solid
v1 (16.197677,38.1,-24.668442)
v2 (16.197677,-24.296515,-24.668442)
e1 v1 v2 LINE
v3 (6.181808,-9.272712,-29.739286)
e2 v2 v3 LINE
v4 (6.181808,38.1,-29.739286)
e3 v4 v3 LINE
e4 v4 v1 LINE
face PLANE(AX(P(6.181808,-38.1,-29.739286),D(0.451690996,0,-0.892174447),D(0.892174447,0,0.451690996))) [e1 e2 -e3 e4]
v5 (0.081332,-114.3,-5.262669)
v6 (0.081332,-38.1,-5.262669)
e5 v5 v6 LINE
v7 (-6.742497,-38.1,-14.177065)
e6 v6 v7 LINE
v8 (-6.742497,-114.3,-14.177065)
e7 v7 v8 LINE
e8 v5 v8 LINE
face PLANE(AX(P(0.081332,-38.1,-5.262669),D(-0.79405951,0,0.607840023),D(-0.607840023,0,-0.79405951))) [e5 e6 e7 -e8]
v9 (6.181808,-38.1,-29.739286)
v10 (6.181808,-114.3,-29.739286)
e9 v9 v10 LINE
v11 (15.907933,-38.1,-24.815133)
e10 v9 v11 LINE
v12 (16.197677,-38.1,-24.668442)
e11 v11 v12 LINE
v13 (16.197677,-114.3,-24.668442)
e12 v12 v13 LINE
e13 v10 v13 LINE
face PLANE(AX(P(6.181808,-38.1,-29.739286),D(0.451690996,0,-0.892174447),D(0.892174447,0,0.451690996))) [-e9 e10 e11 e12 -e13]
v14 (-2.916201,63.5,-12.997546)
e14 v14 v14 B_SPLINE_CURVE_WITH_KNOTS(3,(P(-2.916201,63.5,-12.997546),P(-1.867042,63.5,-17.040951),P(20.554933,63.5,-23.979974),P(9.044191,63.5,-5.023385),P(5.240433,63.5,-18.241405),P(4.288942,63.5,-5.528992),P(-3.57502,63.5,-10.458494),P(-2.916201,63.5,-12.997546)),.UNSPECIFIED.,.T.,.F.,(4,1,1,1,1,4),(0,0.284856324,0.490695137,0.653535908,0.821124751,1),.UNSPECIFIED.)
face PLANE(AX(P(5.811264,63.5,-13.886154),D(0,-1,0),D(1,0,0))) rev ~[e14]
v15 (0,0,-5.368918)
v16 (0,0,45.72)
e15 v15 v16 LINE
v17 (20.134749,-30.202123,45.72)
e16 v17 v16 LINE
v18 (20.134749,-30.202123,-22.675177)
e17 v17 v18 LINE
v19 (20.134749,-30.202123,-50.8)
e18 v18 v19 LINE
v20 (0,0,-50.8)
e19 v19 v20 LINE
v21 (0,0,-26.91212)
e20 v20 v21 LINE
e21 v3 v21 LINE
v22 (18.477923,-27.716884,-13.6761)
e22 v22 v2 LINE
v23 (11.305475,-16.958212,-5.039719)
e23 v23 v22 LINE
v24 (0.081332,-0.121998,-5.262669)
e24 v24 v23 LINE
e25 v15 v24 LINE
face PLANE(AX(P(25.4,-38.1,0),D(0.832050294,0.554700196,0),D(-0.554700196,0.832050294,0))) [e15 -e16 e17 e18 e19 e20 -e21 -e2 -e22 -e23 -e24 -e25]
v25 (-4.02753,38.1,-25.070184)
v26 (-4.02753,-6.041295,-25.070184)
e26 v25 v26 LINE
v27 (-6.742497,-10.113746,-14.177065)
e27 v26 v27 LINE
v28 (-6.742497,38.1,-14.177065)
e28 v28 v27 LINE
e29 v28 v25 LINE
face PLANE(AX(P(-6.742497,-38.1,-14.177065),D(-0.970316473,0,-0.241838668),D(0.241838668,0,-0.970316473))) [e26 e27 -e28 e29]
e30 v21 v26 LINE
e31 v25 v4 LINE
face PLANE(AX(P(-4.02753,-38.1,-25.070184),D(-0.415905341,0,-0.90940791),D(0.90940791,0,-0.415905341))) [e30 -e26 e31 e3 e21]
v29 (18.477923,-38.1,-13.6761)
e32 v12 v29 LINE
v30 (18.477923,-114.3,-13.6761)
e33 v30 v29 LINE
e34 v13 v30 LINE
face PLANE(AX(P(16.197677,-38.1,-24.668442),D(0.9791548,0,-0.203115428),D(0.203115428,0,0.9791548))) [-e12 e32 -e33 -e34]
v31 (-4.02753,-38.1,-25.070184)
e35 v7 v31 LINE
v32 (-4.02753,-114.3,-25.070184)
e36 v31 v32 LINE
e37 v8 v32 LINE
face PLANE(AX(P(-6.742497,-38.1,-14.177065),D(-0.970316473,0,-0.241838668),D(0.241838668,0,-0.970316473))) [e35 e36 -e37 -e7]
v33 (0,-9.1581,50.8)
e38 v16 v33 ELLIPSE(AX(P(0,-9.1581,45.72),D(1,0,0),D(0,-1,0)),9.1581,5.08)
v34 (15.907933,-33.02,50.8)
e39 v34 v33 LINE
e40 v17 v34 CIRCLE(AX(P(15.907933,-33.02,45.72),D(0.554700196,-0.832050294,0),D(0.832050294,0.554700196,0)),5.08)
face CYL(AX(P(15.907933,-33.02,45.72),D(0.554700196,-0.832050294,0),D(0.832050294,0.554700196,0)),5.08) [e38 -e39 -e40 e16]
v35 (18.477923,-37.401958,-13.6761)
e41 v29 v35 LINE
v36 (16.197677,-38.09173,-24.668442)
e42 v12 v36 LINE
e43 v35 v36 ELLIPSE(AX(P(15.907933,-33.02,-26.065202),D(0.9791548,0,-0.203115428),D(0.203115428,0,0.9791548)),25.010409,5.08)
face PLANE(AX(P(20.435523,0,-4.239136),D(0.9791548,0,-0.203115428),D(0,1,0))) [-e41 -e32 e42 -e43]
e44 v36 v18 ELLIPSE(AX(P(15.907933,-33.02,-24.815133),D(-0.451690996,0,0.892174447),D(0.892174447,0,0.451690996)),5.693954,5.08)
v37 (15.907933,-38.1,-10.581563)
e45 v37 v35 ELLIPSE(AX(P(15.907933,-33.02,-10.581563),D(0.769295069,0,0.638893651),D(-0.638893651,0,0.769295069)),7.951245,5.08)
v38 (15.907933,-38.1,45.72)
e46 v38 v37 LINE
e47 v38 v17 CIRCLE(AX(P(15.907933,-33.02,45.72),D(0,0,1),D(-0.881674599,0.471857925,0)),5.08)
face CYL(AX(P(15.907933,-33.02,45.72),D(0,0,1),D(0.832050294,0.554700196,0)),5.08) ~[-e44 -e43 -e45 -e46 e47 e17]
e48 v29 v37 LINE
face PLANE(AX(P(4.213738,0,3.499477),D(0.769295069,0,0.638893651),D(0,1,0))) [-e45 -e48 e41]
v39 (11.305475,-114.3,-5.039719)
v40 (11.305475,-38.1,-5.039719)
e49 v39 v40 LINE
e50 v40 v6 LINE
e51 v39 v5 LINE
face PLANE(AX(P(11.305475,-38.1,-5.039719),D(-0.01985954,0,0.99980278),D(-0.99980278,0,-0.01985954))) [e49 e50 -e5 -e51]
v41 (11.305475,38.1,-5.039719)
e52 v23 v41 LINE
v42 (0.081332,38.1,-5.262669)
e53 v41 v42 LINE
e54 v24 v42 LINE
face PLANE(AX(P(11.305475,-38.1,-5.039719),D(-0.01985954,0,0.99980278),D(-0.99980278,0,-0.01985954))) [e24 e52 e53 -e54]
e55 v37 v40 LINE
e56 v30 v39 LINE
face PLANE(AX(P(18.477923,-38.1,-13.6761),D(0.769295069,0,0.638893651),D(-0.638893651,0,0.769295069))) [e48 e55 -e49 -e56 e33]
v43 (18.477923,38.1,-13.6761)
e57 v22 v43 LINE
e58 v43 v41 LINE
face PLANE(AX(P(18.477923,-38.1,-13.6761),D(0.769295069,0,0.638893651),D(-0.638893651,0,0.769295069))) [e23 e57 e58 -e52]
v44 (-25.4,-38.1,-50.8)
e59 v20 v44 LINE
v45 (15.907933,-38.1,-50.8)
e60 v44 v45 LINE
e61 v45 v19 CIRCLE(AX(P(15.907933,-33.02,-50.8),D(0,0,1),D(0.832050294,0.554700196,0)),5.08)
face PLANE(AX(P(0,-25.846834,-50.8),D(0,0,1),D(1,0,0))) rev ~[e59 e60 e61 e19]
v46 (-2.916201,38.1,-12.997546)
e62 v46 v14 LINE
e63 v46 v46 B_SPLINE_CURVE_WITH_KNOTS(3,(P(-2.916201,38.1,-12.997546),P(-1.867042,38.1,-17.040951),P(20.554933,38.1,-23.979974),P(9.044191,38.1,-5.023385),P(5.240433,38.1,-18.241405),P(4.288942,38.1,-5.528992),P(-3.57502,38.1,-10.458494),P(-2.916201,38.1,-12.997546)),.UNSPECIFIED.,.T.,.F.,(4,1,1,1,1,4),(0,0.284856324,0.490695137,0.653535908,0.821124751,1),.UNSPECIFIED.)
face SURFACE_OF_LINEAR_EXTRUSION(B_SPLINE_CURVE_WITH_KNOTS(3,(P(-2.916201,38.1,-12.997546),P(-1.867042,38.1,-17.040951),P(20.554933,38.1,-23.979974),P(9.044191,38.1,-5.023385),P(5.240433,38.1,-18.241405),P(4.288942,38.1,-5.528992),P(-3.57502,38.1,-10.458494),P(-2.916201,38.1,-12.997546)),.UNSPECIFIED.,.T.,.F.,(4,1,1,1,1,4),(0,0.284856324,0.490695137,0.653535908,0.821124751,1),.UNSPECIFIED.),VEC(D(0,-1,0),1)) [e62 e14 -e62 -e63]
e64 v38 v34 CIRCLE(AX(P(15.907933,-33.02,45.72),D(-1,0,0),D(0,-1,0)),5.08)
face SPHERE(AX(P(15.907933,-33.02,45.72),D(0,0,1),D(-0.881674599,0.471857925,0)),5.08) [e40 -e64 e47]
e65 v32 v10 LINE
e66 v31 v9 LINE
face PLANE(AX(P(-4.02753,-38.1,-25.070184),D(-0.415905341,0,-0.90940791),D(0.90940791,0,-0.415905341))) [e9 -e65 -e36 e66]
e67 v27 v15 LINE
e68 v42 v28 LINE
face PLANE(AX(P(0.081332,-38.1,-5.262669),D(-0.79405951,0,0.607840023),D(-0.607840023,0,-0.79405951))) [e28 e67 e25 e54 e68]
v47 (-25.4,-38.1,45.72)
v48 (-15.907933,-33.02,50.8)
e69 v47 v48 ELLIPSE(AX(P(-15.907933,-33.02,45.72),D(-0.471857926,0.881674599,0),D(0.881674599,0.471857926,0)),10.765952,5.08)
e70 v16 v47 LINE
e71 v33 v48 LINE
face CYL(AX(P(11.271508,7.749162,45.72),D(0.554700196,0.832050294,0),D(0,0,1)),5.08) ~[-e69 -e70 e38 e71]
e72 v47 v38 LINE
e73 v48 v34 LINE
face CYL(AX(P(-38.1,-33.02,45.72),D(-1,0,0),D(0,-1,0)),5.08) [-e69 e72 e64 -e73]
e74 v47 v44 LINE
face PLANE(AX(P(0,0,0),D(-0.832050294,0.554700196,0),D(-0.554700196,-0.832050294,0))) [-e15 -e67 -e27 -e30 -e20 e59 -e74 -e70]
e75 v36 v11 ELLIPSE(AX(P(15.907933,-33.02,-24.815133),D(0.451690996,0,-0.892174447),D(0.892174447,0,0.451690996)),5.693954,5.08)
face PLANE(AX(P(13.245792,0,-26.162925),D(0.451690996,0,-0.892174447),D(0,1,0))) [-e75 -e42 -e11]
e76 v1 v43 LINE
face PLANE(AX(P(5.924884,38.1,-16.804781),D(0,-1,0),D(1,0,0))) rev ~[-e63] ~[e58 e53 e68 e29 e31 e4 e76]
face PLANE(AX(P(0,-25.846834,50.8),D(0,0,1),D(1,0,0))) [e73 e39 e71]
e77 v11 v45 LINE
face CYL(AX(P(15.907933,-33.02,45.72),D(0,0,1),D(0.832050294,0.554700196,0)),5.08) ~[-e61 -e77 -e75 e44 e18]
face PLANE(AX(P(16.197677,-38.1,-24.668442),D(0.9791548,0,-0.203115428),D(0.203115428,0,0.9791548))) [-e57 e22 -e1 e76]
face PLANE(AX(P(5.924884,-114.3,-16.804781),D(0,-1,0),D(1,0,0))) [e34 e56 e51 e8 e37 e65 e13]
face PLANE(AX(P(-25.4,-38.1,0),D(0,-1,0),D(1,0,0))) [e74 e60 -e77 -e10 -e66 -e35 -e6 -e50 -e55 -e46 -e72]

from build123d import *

# Parameters (mm, degrees)
F1_DEPTH     = 50.8
F3_DEPTH     = 76.2
F5_DEPTH     = 25.4
F6_T1_DEPTH  = 48.9984343719
F6_T3_DEPTH  = 71.1905011984
F6_T5_DEPTH  = 54.0079331735
F6_T10_DEPTH = 5.08
F6_T16_DEPTH = 120.2501670661
F6_T22_DEPTH = 120.2501670661
F6_T29_DEPTH = 120.2501670661
F6_T35_DEPTH = 120.2501670661
F6_T42_DEPTH = 120.2501670661
F6_T49_DEPTH = 120.2501670661


# Not quite as in the source:
# - a fillet or chamfer that OpenCascade refuses, or shapes differently, is made with other operations: its cross-section is extruded or revolved along the edge and cut away or added


with BuildPart() as f1:
    # F0 (on Top) → F1 (new body, symmetric)
    with BuildSketch(Plane.XY):
        Polygon((25.4, -38.1), (0, 0), (-25.4, -38.1), align=None)
    extrude(amount=F1_DEPTH, both=True)

    # F2 (on face) → F3 (join, symmetric)
    with BuildSketch(Plane.XZ.offset(38.1)):
        Polygon((0.0813317902, -5.2626694994), (-6.7424972958, -14.1770650191), (-4.0275300761, -25.0701841258), (6.1818077576, -29.739285953), (16.197676584, -24.6684415925), (18.4779228904, -13.6761002742), (11.3054746994, -5.0397192136), align=None)
    extrude(amount=F3_DEPTH, both=True)

    # F4 (on face) → F5 (join)
    with BuildSketch(Plane(origin=(0, 38.1, 0), x_dir=(-1, 0, 0), z_dir=(0, 1, 0))):
        with BuildLine():
            add(Edge.make_bspline(
                [(2.9162010178, -12.9975462332), (1.8670415569, -17.0409513366), (-20.5549326749, -23.97997421), (-9.0441910265, -5.0233845041), (-5.2404331156, -18.2414045319), (-4.2889415012, -5.528991709), (3.5750196715, -10.4584939673), (2.9162010178, -12.9975462332)],
                knots=[0, 0, 0, 0, 0.2848563236, 0.490695137, 0.6535359084, 0.8211247512, 1, 1, 1, 1], degree=3))
        make_face()
    extrude(amount=F5_DEPTH)

    # F6: fillet of radius 5.08 on 4 edges, made by hand

    # F6_s2 → F6_t1 (cut)
    with BuildSketch(Plane(origin=(20.1347486688, -30.2021230032, 0), x_dir=(0, 0, 1), z_dir=(-0.5547001962, 0.8320502943, 0))):
        with BuildLine():
            ThreePointArc((45.72, 0), (49.3121024484, -1.4878975516), (50.8, -5.08))
            Line((50.8, -5.08), (50.8, 0))
            Line((50.8, 0), (45.72, 0))
        make_face()
    extrude(amount=F6_T1_DEPTH, mode=Mode.SUBTRACT)

    # F6_s4 → F6_t3 (cut)
    with BuildSketch(Plane(origin=(7.0446924921, 10.5670387381, 0), x_dir=(0, 0, 1), z_dir=(-0.5547001962, -0.8320502943, 0))):
        with BuildLine():
            ThreePointArc((50.8, -5.08), (49.3121024484, -1.4878975516), (45.72, 0))
            Line((45.72, 0), (50.8, 0))
            Line((50.8, 0), (50.8, -5.08))
        make_face()
    extrude(amount=F6_T3_DEPTH, mode=Mode.SUBTRACT)

    # F6_s6 → F6_t5 (cut)
    with BuildSketch(Plane.YZ.offset(-38.1)):
        with BuildLine():
            ThreePointArc((-38.1, 45.72), (-36.6121024484, 49.3121024484), (-33.02, 50.8))
            Line((-33.02, 50.8), (-38.1, 50.8))
            Line((-38.1, 50.8), (-38.1, 45.72))
        make_face()
    extrude(amount=F6_T5_DEPTH, mode=Mode.SUBTRACT)


with BuildPart() as f6_tool8:
    # F6_s9 → F6_t10 (new body)
    with BuildSketch(Plane.XY.offset(45.72)):
        Polygon((15.9079331735, -33.02), (20.1347486688, -30.2021230032), (25.4, -38.1), (15.9079331735, -38.1), align=None)
    extrude(amount=F6_T10_DEPTH)

    # F6_s11 → F6_t12 (revolve, cut)
    with BuildSketch(Plane(origin=(15.9079331735, -33.02, 45.72), x_dir=(-0.8816745988, 0.4718579255, 0), z_dir=(0.4718579255, 0.8816745988, 0))):
        with BuildLine():
            ThreePointArc((0, -5.08), (5.08, 0), (0, 5.08))
            Line((0, 5.08), (0, -5.08))
        make_face()
    revolve(axis=Axis((15.9079331735, -33.02, 45.72), (0, 0, 1)), mode=Mode.SUBTRACT)


with BuildPart() as f1_1:
    add(f1.part)

    # F6_t7: cut F6_tool8
    add(f6_tool8.part, mode=Mode.SUBTRACT)


with BuildPart() as f6_tool14:
    # F6_s15 → F6_t16 (new body)
    with BuildSketch(Plane.XY.offset(45.72)):
        with BuildLine():
            ThreePointArc((20.1347486688, -30.2021230032), (20.3868401353, -35.4170382617), (15.9079331735, -38.1))
            Line((15.9079331735, -38.1), (25.4, -38.1))
            Line((25.4, -38.1), (20.1347486688, -30.2021230032))
        make_face()
    extrude(amount=-F6_T16_DEPTH)

    split(bisect_by=Plane(origin=(20.4355225798, 0, -4.2391355518), x_dir=(0, 1, 0), z_dir=(-0.9791548002, 0, 0.2031154284)), keep=Keep.TOP)

    split(bisect_by=Plane(origin=(4.2137378339, 0, 3.4994769327), x_dir=(0, 1, 0), z_dir=(0.7692950689, 0, 0.6388936508)), keep=Keep.TOP)


with BuildPart() as f1_2:
    add(f1_1.part)

    # F6_t13: cut F6_tool14
    add(f6_tool14.part, mode=Mode.SUBTRACT)


with BuildPart() as f6_tool20:
    # F6_s21 → F6_t22 (new body)
    with BuildSketch(Plane.XY.offset(45.72)):
        with BuildLine():
            ThreePointArc((20.1347486688, -30.2021230032), (20.3868401353, -35.4170382617), (15.9079331735, -38.1))
            Line((15.9079331735, -38.1), (25.4, -38.1))
            Line((25.4, -38.1), (20.1347486688, -30.2021230032))
        make_face()
    extrude(amount=-F6_T22_DEPTH)

    split(bisect_by=Plane(origin=(13.2457923387, 0, -26.1629245812), x_dir=(0, 1, 0), z_dir=(-0.4516909958, 0, 0.8921744472)), keep=Keep.TOP)

    split(bisect_by=Plane(origin=(20.4355225798, 0, -4.2391355518), x_dir=(0, 1, 0), z_dir=(0.9791548002, 0, -0.2031154284)), keep=Keep.TOP)

    split(bisect_by=Plane(origin=(4.2137378339, 0, 3.4994769327), x_dir=(0, 1, 0), z_dir=(0.7692950689, 0, 0.6388936508)), keep=Keep.TOP)


with BuildPart() as f1_3:
    add(f1_2.part)

    # F6_t19: cut F6_tool20
    add(f6_tool20.part, mode=Mode.SUBTRACT)


with BuildPart() as f6_tool27:
    # F6_s28 → F6_t29 (new body)
    with BuildSketch(Plane.XY.offset(45.72)):
        with BuildLine():
            ThreePointArc((20.1347486688, -30.2021230032), (20.3868401353, -35.4170382617), (15.9079331735, -38.1))
            Line((15.9079331735, -38.1), (25.4, -38.1))
            Line((25.4, -38.1), (20.1347486688, -30.2021230032))
        make_face()
    extrude(amount=-F6_T29_DEPTH)

    split(bisect_by=Plane(origin=(13.2457923387, 0, -26.1629245812), x_dir=(0, 1, 0), z_dir=(0.4516909958, 0, -0.8921744472)), keep=Keep.TOP)

    split(bisect_by=Plane(origin=(20.4355225798, 0, -4.2391355518), x_dir=(0, 1, 0), z_dir=(-0.9791548002, 0, 0.2031154284)), keep=Keep.TOP)


with BuildPart() as f1_4:
    add(f1_3.part)

    # F6_t26: cut F6_tool27
    add(f6_tool27.part, mode=Mode.SUBTRACT)


with BuildPart() as f6_tool33:
    # F6_s34 → F6_t35 (new body)
    with BuildSketch(Plane.XY.offset(45.72)):
        with BuildLine():
            ThreePointArc((20.1347486688, -30.2021230032), (20.3868401353, -35.4170382617), (15.9079331735, -38.1))
            Line((15.9079331735, -38.1), (25.4, -38.1))
            Line((25.4, -38.1), (20.1347486688, -30.2021230032))
        make_face()
    extrude(amount=-F6_T35_DEPTH)

    split(bisect_by=Plane(origin=(13.2457923387, 0, -26.1629245812), x_dir=(0, 1, 0), z_dir=(-0.4516909958, 0, 0.8921744472)), keep=Keep.TOP)

    split(bisect_by=Plane(origin=(20.4355225798, 0, -4.2391355518), x_dir=(0, 1, 0), z_dir=(0.9791548002, 0, -0.2031154284)), keep=Keep.TOP)

    split(bisect_by=Plane(origin=(4.2137378339, 0, 3.4994769327), x_dir=(0, 1, 0), z_dir=(-0.7692950689, 0, -0.6388936508)), keep=Keep.TOP)


with BuildPart() as f1_5:
    add(f1_4.part)

    # F6_t32: cut F6_tool33
    add(f6_tool33.part, mode=Mode.SUBTRACT)


with BuildPart() as f6_tool40:
    # F6_s41 → F6_t42 (new body)
    with BuildSketch(Plane.XY.offset(45.72)):
        with BuildLine():
            ThreePointArc((20.1347486688, -30.2021230032), (20.3868401353, -35.4170382617), (15.9079331735, -38.1))
            Line((15.9079331735, -38.1), (25.4, -38.1))
            Line((25.4, -38.1), (20.1347486688, -30.2021230032))
        make_face()
    extrude(amount=-F6_T42_DEPTH)

    split(bisect_by=Plane(origin=(13.2457923387, 0, -26.1629245812), x_dir=(0, 1, 0), z_dir=(0.4516909958, 0, -0.8921744472)), keep=Keep.TOP)

    split(bisect_by=Plane(origin=(20.4355225798, 0, -4.2391355518), x_dir=(0, 1, 0), z_dir=(0.9791548002, 0, -0.2031154284)), keep=Keep.TOP)

    split(bisect_by=Plane(origin=(4.2137378339, 0, 3.4994769327), x_dir=(0, 1, 0), z_dir=(-0.7692950689, 0, -0.6388936508)), keep=Keep.TOP)


with BuildPart() as f1_6:
    add(f1_5.part)

    # F6_t39: cut F6_tool40
    add(f6_tool40.part, mode=Mode.SUBTRACT)


with BuildPart() as f6_tool47:
    # F6_s48 → F6_t49 (new body)
    with BuildSketch(Plane.XY.offset(45.72)):
        with BuildLine():
            ThreePointArc((20.1347486688, -30.2021230032), (20.3868401353, -35.4170382617), (15.9079331735, -38.1))
            Line((15.9079331735, -38.1), (25.4, -38.1))
            Line((25.4, -38.1), (20.1347486688, -30.2021230032))
        make_face()
    extrude(amount=-F6_T49_DEPTH)

    split(bisect_by=Plane(origin=(13.2457923387, 0, -26.1629245812), x_dir=(0, 1, 0), z_dir=(0.4516909958, 0, -0.8921744472)), keep=Keep.TOP)

    split(bisect_by=Plane(origin=(4.2137378339, 0, 3.4994769327), x_dir=(0, 1, 0), z_dir=(0.7692950689, 0, 0.6388936508)), keep=Keep.TOP)


with BuildPart() as f1_7:
    add(f1_6.part)

    # F6_t46: cut F6_tool47
    add(f6_tool47.part, mode=Mode.SUBTRACT)


solid = f1_7.part
